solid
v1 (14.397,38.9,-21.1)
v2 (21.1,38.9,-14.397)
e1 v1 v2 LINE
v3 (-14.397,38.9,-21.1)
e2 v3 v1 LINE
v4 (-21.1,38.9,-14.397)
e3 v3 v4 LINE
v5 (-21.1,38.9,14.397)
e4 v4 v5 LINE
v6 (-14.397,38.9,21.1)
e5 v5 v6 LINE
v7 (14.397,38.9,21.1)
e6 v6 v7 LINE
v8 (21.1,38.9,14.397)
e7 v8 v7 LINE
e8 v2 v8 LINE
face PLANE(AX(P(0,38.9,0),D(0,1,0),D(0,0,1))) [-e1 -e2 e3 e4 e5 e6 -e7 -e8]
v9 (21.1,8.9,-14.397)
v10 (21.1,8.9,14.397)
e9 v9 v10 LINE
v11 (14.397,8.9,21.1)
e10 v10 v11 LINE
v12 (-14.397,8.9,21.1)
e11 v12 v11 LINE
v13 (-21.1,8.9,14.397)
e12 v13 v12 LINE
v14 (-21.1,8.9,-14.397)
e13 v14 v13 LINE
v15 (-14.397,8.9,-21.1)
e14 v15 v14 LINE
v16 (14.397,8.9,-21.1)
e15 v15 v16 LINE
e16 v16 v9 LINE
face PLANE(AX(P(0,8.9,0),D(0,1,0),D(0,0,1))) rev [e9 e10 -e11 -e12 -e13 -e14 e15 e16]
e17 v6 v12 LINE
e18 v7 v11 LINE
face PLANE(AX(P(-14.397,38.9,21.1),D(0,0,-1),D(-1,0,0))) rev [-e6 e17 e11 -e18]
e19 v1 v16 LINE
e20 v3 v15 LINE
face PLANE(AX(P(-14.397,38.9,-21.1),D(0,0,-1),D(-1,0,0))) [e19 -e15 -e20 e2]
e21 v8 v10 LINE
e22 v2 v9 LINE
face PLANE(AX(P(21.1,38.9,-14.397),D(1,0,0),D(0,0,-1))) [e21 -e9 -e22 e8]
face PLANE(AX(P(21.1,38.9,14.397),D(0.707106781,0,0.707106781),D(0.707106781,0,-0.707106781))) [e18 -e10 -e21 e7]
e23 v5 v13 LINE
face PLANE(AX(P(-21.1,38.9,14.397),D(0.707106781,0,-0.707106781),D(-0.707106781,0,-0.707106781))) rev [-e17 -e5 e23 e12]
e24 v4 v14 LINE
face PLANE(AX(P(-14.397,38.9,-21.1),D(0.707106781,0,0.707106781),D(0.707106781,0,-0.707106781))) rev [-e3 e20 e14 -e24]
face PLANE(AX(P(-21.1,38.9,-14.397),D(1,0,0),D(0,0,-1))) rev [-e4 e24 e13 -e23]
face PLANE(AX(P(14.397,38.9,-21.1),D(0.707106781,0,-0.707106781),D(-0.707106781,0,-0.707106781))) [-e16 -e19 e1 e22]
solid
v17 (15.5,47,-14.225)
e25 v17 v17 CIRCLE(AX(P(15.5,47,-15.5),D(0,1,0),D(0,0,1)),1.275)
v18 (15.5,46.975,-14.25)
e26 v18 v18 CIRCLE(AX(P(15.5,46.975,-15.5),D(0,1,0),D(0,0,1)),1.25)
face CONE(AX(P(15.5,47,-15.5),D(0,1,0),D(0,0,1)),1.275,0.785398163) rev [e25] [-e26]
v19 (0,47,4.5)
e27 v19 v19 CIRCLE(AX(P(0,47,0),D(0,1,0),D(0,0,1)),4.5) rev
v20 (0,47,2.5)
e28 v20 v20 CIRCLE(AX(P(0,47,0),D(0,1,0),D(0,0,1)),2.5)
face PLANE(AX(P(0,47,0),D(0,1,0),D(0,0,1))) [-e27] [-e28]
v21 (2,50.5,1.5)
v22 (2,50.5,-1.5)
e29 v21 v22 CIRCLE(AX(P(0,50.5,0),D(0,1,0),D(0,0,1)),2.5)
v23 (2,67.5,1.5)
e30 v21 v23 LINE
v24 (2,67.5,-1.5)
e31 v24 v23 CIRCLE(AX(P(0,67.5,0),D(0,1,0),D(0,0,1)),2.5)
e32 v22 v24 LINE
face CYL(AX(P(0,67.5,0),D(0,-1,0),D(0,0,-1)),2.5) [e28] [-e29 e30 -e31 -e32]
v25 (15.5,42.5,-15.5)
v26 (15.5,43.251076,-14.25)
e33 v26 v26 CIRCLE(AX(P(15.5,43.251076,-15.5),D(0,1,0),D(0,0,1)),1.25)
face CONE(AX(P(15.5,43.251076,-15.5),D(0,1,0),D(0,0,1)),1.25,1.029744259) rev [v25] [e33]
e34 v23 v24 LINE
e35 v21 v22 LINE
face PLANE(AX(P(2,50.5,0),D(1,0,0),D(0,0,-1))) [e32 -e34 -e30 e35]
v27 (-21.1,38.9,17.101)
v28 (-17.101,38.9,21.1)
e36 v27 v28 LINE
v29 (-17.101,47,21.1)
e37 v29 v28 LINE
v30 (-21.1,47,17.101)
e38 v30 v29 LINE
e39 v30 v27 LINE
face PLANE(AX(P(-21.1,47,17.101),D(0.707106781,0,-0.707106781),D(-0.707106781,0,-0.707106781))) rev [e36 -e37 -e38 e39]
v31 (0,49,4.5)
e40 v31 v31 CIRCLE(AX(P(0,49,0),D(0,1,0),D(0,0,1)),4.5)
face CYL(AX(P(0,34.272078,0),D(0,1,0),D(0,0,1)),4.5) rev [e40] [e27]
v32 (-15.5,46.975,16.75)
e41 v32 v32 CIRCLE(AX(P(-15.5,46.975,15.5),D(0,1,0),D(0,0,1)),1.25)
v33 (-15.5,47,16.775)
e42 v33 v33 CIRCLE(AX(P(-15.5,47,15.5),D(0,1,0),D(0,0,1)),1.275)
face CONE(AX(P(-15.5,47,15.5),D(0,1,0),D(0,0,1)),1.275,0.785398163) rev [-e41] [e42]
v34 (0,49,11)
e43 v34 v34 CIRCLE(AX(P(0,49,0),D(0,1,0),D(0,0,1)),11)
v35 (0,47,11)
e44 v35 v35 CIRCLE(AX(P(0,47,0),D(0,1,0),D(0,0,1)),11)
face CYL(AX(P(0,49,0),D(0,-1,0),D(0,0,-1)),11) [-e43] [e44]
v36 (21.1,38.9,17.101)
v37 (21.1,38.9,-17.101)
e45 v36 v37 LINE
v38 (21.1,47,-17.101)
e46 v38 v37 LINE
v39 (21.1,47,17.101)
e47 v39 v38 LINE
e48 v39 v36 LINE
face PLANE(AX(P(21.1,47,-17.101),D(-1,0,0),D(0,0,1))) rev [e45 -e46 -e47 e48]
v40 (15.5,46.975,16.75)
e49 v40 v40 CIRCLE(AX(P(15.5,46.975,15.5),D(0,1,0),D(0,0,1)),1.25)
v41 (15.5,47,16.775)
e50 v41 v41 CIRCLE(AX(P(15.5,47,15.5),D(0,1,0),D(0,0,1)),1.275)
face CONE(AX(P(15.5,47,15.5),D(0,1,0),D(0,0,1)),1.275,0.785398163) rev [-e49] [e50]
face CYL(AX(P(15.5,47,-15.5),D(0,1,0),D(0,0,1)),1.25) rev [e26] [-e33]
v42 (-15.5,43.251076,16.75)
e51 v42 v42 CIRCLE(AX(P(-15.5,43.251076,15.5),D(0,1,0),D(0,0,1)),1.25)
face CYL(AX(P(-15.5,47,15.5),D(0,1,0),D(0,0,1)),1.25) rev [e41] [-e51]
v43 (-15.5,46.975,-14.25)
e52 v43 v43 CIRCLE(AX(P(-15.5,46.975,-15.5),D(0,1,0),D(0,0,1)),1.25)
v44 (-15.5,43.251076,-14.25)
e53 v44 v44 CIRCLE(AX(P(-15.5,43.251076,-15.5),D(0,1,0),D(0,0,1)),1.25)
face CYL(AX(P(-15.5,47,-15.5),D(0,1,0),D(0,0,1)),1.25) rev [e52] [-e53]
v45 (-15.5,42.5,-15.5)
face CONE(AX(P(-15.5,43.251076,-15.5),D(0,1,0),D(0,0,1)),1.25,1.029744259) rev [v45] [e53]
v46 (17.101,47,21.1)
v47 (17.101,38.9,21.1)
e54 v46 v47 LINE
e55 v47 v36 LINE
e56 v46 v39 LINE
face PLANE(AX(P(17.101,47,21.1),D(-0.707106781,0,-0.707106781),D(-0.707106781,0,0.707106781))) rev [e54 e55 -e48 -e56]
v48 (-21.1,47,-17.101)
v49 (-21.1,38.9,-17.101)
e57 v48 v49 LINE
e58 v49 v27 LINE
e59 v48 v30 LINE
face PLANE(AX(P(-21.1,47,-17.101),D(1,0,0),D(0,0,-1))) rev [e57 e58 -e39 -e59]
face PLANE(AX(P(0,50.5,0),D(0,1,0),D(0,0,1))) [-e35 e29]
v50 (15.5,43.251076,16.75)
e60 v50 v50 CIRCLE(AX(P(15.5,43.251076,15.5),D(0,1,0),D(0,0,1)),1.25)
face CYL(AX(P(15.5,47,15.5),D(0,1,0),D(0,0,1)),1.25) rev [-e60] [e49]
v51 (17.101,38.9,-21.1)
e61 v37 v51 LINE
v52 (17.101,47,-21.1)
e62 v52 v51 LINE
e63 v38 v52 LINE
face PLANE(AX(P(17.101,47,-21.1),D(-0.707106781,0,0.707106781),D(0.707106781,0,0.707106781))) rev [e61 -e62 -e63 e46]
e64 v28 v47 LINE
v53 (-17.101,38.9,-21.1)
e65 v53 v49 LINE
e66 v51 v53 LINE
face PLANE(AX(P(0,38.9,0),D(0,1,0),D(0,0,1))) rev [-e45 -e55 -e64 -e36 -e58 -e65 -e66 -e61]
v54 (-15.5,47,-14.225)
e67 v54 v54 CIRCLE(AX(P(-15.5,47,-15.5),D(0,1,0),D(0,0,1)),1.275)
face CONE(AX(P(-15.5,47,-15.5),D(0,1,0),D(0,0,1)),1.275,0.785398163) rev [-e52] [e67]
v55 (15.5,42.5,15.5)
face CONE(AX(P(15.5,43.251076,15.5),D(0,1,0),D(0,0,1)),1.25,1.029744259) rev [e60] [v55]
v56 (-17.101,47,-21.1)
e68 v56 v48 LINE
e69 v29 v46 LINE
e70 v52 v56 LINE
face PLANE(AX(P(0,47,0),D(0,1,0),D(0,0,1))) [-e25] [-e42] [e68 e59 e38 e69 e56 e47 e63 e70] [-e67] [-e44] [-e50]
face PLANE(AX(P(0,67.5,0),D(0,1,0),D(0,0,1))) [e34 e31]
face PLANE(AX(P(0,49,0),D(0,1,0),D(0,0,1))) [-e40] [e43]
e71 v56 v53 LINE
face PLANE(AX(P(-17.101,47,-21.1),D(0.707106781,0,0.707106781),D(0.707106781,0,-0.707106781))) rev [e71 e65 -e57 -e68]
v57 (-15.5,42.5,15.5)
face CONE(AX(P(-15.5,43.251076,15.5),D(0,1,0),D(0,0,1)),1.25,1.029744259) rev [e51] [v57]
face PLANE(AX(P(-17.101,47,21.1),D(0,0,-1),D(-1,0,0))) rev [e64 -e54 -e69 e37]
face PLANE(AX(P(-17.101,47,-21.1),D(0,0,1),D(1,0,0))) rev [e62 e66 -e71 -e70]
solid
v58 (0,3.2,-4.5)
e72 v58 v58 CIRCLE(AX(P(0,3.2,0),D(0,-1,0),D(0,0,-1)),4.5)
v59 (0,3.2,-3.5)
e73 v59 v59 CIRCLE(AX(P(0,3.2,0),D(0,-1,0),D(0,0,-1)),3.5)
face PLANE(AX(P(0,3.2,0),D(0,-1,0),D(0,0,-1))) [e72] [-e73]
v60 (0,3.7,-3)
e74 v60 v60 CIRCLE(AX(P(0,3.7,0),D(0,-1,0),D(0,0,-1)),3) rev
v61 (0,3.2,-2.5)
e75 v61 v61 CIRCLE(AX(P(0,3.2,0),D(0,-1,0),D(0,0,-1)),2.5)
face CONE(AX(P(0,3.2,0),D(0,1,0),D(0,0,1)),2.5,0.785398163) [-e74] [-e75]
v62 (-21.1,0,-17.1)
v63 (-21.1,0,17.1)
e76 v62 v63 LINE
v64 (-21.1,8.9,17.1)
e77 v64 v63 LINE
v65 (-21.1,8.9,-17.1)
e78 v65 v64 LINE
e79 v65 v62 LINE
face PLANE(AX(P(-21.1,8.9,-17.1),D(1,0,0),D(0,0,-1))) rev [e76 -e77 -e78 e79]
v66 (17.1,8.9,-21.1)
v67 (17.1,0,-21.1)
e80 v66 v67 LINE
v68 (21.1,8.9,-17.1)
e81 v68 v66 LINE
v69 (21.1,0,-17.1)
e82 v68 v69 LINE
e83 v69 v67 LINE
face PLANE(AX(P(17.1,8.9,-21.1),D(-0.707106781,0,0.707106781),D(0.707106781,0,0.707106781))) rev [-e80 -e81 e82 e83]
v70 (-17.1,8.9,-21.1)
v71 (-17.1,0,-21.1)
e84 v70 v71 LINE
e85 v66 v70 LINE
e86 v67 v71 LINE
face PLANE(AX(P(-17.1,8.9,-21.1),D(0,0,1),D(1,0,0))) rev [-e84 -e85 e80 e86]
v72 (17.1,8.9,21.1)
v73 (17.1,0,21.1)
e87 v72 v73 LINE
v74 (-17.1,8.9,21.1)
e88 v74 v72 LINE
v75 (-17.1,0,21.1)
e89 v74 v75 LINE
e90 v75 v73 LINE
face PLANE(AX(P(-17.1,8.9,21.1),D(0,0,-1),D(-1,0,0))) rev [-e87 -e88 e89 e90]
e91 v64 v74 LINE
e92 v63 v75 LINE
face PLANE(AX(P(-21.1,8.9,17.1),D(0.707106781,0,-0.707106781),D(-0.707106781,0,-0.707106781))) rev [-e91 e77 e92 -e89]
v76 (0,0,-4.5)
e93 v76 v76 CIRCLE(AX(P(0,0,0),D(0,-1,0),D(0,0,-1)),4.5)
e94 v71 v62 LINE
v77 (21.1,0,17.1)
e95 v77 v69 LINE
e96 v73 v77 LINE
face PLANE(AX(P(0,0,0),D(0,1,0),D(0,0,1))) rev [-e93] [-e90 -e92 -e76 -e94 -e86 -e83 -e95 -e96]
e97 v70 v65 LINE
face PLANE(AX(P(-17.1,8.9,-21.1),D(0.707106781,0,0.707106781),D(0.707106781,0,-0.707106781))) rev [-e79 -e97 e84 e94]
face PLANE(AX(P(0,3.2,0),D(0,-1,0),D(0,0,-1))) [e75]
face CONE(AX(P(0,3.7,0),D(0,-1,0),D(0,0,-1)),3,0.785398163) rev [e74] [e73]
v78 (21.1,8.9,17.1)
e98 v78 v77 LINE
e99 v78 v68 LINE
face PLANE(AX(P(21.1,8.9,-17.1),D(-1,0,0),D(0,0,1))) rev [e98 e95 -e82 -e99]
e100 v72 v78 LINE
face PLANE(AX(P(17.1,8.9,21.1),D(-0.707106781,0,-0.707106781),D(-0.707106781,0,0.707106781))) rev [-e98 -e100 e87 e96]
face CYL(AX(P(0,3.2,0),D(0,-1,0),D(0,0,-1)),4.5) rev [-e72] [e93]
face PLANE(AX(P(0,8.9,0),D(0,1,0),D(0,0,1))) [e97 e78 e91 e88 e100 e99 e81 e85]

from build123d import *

# Parameters (mm, degrees)
BOSS_EXTRUDE2_DEPTH              = 8.9
BOSS_EXTRUDE3_DEPTH              = 0.5
LPATTERN8_COUNT                  = 60
LPATTERN8_PITCH                  = 0.5
BOSS_EXTRUDE4_DEPTH              = 8.1
SKETCH5_R                        = 11
BOSS_EXTRUDE5_DEPTH              = 2
SKETCH6_R                        = 4.5
CUT_EXTRUDE1_DEPTH               = 2
SKETCH7_R                        = 2.5
BOSS_EXTRUDE6_DEPTH              = 20.5
CUT_EXTRUDE2_DEPTH               = 17
TAP_DRILL_FOR_M3_TAP1_AT_2_COUNT = 2
TAP_DRILL_FOR_M3_TAP1_AT_2_PITCH = 31
TAP_DRILL_FOR_M3_TAP1_AT_3_COUNT = 2
TAP_DRILL_FOR_M3_TAP1_AT_3_PITCH = 43.840620434
TAP_DRILL_FOR_M3_TAP1_AT_4_COUNT = 2
TAP_DRILL_FOR_M3_TAP1_AT_4_PITCH = 31
SKETCH37_R                       = 4.5
CUT_EXTRUDE8_DEPTH               = 3.2
SKETCH38_R                       = 3.5
SKETCH38_R_2                     = 2.5
CUT_EXTRUDE9_DEPTH               = 0.5
CHAMFER1_SIZE                    = 0.5


with BuildPart() as part:
    # Sketch2 → Boss-Extrude2 (new body)
    with BuildSketch(Plane(origin=(0, 0, 0), x_dir=(1, 0, 0), z_dir=(0, 1, 0))):
        Polygon((-17.1, 21.1), (-21.1, 17.1), (-21.1, -17.1), (-17.1, -21.1), (17.1, -21.1), (21.1, -17.1), (21.1, 17.1), (17.1, 21.1), align=None)
    extrude(amount=BOSS_EXTRUDE2_DEPTH)

    # Sketch37 → Cut-Extrude8 (cut)
    with BuildSketch(Plane.XZ):
        with Locations(Location((0, 0, 0), (0, 0, 90))):
            Circle(SKETCH37_R)
    extrude(amount=-CUT_EXTRUDE8_DEPTH, mode=Mode.SUBTRACT)

    # Sketch38 → Cut-Extrude9 (cut)
    with BuildSketch(Plane.XZ.offset(-3.2)):
        with Locations(Location((0, 0, 0), (0, 0, 270))):
            Circle(SKETCH38_R)
        with Locations(Location((0, 0, 0), (0, 0, 323.130102354))):
            Circle(SKETCH38_R_2, mode=Mode.SUBTRACT)
    extrude(amount=-CUT_EXTRUDE9_DEPTH, mode=Mode.SUBTRACT)

    # Chamfer1
    chamfer1_edges = [part.edges().sort_by_distance(p)[0] for p in [
        (0, 3.7, 3.5),
        (-2, 3.7, 1.5),
    ]]
    chamfer(chamfer1_edges, length=CHAMFER1_SIZE - 0.0001)  # a hair under: the kernel refuses the full size


with BuildPart() as body_2:
    # Sketch3 → Boss-Extrude3 (new body)
    with BuildSketch(Plane(origin=(0, 8.9, 0), x_dir=(1, 0, 0), z_dir=(0, 1, 0))):
        Polygon((-14.397, 21.1), (-21.1, 14.397), (-21.1, -14.397), (-14.397, -21.1), (14.397, -21.1), (21.1, -14.397), (21.1, 14.397), (14.397, 21.1), align=None)
    extrude(amount=BOSS_EXTRUDE3_DEPTH)


with BuildPart() as lpattern8_1:
    # LPattern8: pattern copy
    add(body_2.part.moved(Location(Vector(0, 1, 0) * (1 * LPATTERN8_PITCH))))


with BuildPart() as lpattern8_2:
    # LPattern8: pattern copy
    add(body_2.part.moved(Location(Vector(0, 1, 0) * (2 * LPATTERN8_PITCH))))


with BuildPart() as lpattern8_3:
    # LPattern8: pattern copy
    add(body_2.part.moved(Location(Vector(0, 1, 0) * (3 * LPATTERN8_PITCH))))


with BuildPart() as lpattern8_4:
    # LPattern8: pattern copy
    add(body_2.part.moved(Location(Vector(0, 1, 0) * (4 * LPATTERN8_PITCH))))


with BuildPart() as lpattern8_5:
    # LPattern8: pattern copy
    add(body_2.part.moved(Location(Vector(0, 1, 0) * (5 * LPATTERN8_PITCH))))


with BuildPart() as lpattern8_6:
    # LPattern8: pattern copy
    add(body_2.part.moved(Location(Vector(0, 1, 0) * (6 * LPATTERN8_PITCH))))


with BuildPart() as lpattern8_7:
    # LPattern8: pattern copy
    add(body_2.part.moved(Location(Vector(0, 1, 0) * (7 * LPATTERN8_PITCH))))


with BuildPart() as lpattern8_8:
    # LPattern8: pattern copy
    add(body_2.part.moved(Location(Vector(0, 1, 0) * (8 * LPATTERN8_PITCH))))


with BuildPart() as lpattern8_9:
    # LPattern8: pattern copy
    add(body_2.part.moved(Location(Vector(0, 1, 0) * (9 * LPATTERN8_PITCH))))


with BuildPart() as lpattern8_10:
    # LPattern8: pattern copy
    add(body_2.part.moved(Location(Vector(0, 1, 0) * (10 * LPATTERN8_PITCH))))


with BuildPart() as lpattern8_11:
    # LPattern8: pattern copy
    add(body_2.part.moved(Location(Vector(0, 1, 0) * (11 * LPATTERN8_PITCH))))


with BuildPart() as lpattern8_12:
    # LPattern8: pattern copy
    add(body_2.part.moved(Location(Vector(0, 1, 0) * (12 * LPATTERN8_PITCH))))


with BuildPart() as lpattern8_13:
    # LPattern8: pattern copy
    add(body_2.part.moved(Location(Vector(0, 1, 0) * (13 * LPATTERN8_PITCH))))


with BuildPart() as lpattern8_14:
    # LPattern8: pattern copy
    add(body_2.part.moved(Location(Vector(0, 1, 0) * (14 * LPATTERN8_PITCH))))


with BuildPart() as lpattern8_15:
    # LPattern8: pattern copy
    add(body_2.part.moved(Location(Vector(0, 1, 0) * (15 * LPATTERN8_PITCH))))


with BuildPart() as lpattern8_16:
    # LPattern8: pattern copy
    add(body_2.part.moved(Location(Vector(0, 1, 0) * (16 * LPATTERN8_PITCH))))


with BuildPart() as lpattern8_17:
    # LPattern8: pattern copy
    add(body_2.part.moved(Location(Vector(0, 1, 0) * (17 * LPATTERN8_PITCH))))


with BuildPart() as lpattern8_18:
    # LPattern8: pattern copy
    add(body_2.part.moved(Location(Vector(0, 1, 0) * (18 * LPATTERN8_PITCH))))


with BuildPart() as lpattern8_19:
    # LPattern8: pattern copy
    add(body_2.part.moved(Location(Vector(0, 1, 0) * (19 * LPATTERN8_PITCH))))


with BuildPart() as lpattern8_20:
    # LPattern8: pattern copy
    add(body_2.part.moved(Location(Vector(0, 1, 0) * (20 * LPATTERN8_PITCH))))


with BuildPart() as lpattern8_21:
    # LPattern8: pattern copy
    add(body_2.part.moved(Location(Vector(0, 1, 0) * (21 * LPATTERN8_PITCH))))


with BuildPart() as lpattern8_22:
    # LPattern8: pattern copy
    add(body_2.part.moved(Location(Vector(0, 1, 0) * (22 * LPATTERN8_PITCH))))


with BuildPart() as lpattern8_23:
    # LPattern8: pattern copy
    add(body_2.part.moved(Location(Vector(0, 1, 0) * (23 * LPATTERN8_PITCH))))


with BuildPart() as lpattern8_24:
    # LPattern8: pattern copy
    add(body_2.part.moved(Location(Vector(0, 1, 0) * (24 * LPATTERN8_PITCH))))


with BuildPart() as lpattern8_25:
    # LPattern8: pattern copy
    add(body_2.part.moved(Location(Vector(0, 1, 0) * (25 * LPATTERN8_PITCH))))


with BuildPart() as lpattern8_26:
    # LPattern8: pattern copy
    add(body_2.part.moved(Location(Vector(0, 1, 0) * (26 * LPATTERN8_PITCH))))


with BuildPart() as lpattern8_27:
    # LPattern8: pattern copy
    add(body_2.part.moved(Location(Vector(0, 1, 0) * (27 * LPATTERN8_PITCH))))


with BuildPart() as lpattern8_28:
    # LPattern8: pattern copy
    add(body_2.part.moved(Location(Vector(0, 1, 0) * (28 * LPATTERN8_PITCH))))


with BuildPart() as lpattern8_29:
    # LPattern8: pattern copy
    add(body_2.part.moved(Location(Vector(0, 1, 0) * (29 * LPATTERN8_PITCH))))


with BuildPart() as lpattern8_30:
    # LPattern8: pattern copy
    add(body_2.part.moved(Location(Vector(0, 1, 0) * (30 * LPATTERN8_PITCH))))


with BuildPart() as lpattern8_31:
    # LPattern8: pattern copy
    add(body_2.part.moved(Location(Vector(0, 1, 0) * (31 * LPATTERN8_PITCH))))


with BuildPart() as lpattern8_32:
    # LPattern8: pattern copy
    add(body_2.part.moved(Location(Vector(0, 1, 0) * (32 * LPATTERN8_PITCH))))


with BuildPart() as lpattern8_33:
    # LPattern8: pattern copy
    add(body_2.part.moved(Location(Vector(0, 1, 0) * (33 * LPATTERN8_PITCH))))


with BuildPart() as lpattern8_34:
    # LPattern8: pattern copy
    add(body_2.part.moved(Location(Vector(0, 1, 0) * (34 * LPATTERN8_PITCH))))


with BuildPart() as lpattern8_35:
    # LPattern8: pattern copy
    add(body_2.part.moved(Location(Vector(0, 1, 0) * (35 * LPATTERN8_PITCH))))


with BuildPart() as lpattern8_36:
    # LPattern8: pattern copy
    add(body_2.part.moved(Location(Vector(0, 1, 0) * (36 * LPATTERN8_PITCH))))


with BuildPart() as lpattern8_37:
    # LPattern8: pattern copy
    add(body_2.part.moved(Location(Vector(0, 1, 0) * (37 * LPATTERN8_PITCH))))


with BuildPart() as lpattern8_38:
    # LPattern8: pattern copy
    add(body_2.part.moved(Location(Vector(0, 1, 0) * (38 * LPATTERN8_PITCH))))


with BuildPart() as lpattern8_39:
    # LPattern8: pattern copy
    add(body_2.part.moved(Location(Vector(0, 1, 0) * (39 * LPATTERN8_PITCH))))


with BuildPart() as lpattern8_40:
    # LPattern8: pattern copy
    add(body_2.part.moved(Location(Vector(0, 1, 0) * (40 * LPATTERN8_PITCH))))


with BuildPart() as lpattern8_41:
    # LPattern8: pattern copy
    add(body_2.part.moved(Location(Vector(0, 1, 0) * (41 * LPATTERN8_PITCH))))


with BuildPart() as lpattern8_42:
    # LPattern8: pattern copy
    add(body_2.part.moved(Location(Vector(0, 1, 0) * (42 * LPATTERN8_PITCH))))


with BuildPart() as lpattern8_43:
    # LPattern8: pattern copy
    add(body_2.part.moved(Location(Vector(0, 1, 0) * (43 * LPATTERN8_PITCH))))


with BuildPart() as lpattern8_44:
    # LPattern8: pattern copy
    add(body_2.part.moved(Location(Vector(0, 1, 0) * (44 * LPATTERN8_PITCH))))


with BuildPart() as lpattern8_45:
    # LPattern8: pattern copy
    add(body_2.part.moved(Location(Vector(0, 1, 0) * (45 * LPATTERN8_PITCH))))


with BuildPart() as lpattern8_46:
    # LPattern8: pattern copy
    add(body_2.part.moved(Location(Vector(0, 1, 0) * (46 * LPATTERN8_PITCH))))


with BuildPart() as lpattern8_47:
    # LPattern8: pattern copy
    add(body_2.part.moved(Location(Vector(0, 1, 0) * (47 * LPATTERN8_PITCH))))


with BuildPart() as lpattern8_48:
    # LPattern8: pattern copy
    add(body_2.part.moved(Location(Vector(0, 1, 0) * (48 * LPATTERN8_PITCH))))


with BuildPart() as lpattern8_49:
    # LPattern8: pattern copy
    add(body_2.part.moved(Location(Vector(0, 1, 0) * (49 * LPATTERN8_PITCH))))


with BuildPart() as lpattern8_50:
    # LPattern8: pattern copy
    add(body_2.part.moved(Location(Vector(0, 1, 0) * (50 * LPATTERN8_PITCH))))


with BuildPart() as lpattern8_51:
    # LPattern8: pattern copy
    add(body_2.part.moved(Location(Vector(0, 1, 0) * (51 * LPATTERN8_PITCH))))


with BuildPart() as lpattern8_52:
    # LPattern8: pattern copy
    add(body_2.part.moved(Location(Vector(0, 1, 0) * (52 * LPATTERN8_PITCH))))


with BuildPart() as lpattern8_53:
    # LPattern8: pattern copy
    add(body_2.part.moved(Location(Vector(0, 1, 0) * (53 * LPATTERN8_PITCH))))


with BuildPart() as lpattern8_54:
    # LPattern8: pattern copy
    add(body_2.part.moved(Location(Vector(0, 1, 0) * (54 * LPATTERN8_PITCH))))


with BuildPart() as lpattern8_55:
    # LPattern8: pattern copy
    add(body_2.part.moved(Location(Vector(0, 1, 0) * (55 * LPATTERN8_PITCH))))


with BuildPart() as lpattern8_56:
    # LPattern8: pattern copy
    add(body_2.part.moved(Location(Vector(0, 1, 0) * (56 * LPATTERN8_PITCH))))


with BuildPart() as lpattern8_57:
    # LPattern8: pattern copy
    add(body_2.part.moved(Location(Vector(0, 1, 0) * (57 * LPATTERN8_PITCH))))


with BuildPart() as lpattern8_58:
    # LPattern8: pattern copy
    add(body_2.part.moved(Location(Vector(0, 1, 0) * (58 * LPATTERN8_PITCH))))


with BuildPart() as lpattern8_59:
    # LPattern8: pattern copy
    add(body_2.part.moved(Location(Vector(0, 1, 0) * (59 * LPATTERN8_PITCH))))


with BuildPart() as body_2_1:
    add(body_2.part)

    # Combine1: read off the stored shape, not the designer's step
    # Combine1: union LPattern8_2, LPattern8_3, LPattern8_7, LPattern8_8, LPattern8_11, LPattern8_12, LPattern8_13, LPattern8_21, LPattern8_22, LPattern8_24, LPattern8_25, LPattern8_29, LPattern8_30, LPattern8_36, LPattern8_1, LPattern8_4, LPattern8_5, LPattern8_6, LPattern8_9, LPattern8_10, LPattern8_14, LPattern8_15, LPattern8_16, LPattern8_17, LPattern8_18, LPattern8_19, LPattern8_20, LPattern8_23, LPattern8_26, LPattern8_27, LPattern8_28, LPattern8_31, LPattern8_32, LPattern8_33, LPattern8_34, LPattern8_35, LPattern8_37, LPattern8_38, LPattern8_39, LPattern8_40, LPattern8_41, LPattern8_42, LPattern8_43, LPattern8_44, LPattern8_45, LPattern8_46, LPattern8_47, LPattern8_48, LPattern8_49, LPattern8_50, LPattern8_51, LPattern8_52, LPattern8_53, LPattern8_54, LPattern8_56, LPattern8_55, LPattern8_57, LPattern8_58, LPattern8_59
    add(lpattern8_2.part)
    add(lpattern8_3.part)
    add(lpattern8_7.part)
    add(lpattern8_8.part)
    add(lpattern8_11.part)
    add(lpattern8_12.part)
    add(lpattern8_13.part)
    add(lpattern8_21.part)
    add(lpattern8_22.part)
    add(lpattern8_24.part)
    add(lpattern8_25.part)
    add(lpattern8_29.part)
    add(lpattern8_30.part)
    add(lpattern8_36.part)
    add(lpattern8_1.part)
    add(lpattern8_4.part)
    add(lpattern8_5.part)
    add(lpattern8_6.part)
    add(lpattern8_9.part)
    add(lpattern8_10.part)
    add(lpattern8_14.part)
    add(lpattern8_15.part)
    add(lpattern8_16.part)
    add(lpattern8_17.part)
    add(lpattern8_18.part)
    add(lpattern8_19.part)
    add(lpattern8_20.part)
    add(lpattern8_23.part)
    add(lpattern8_26.part)
    add(lpattern8_27.part)
    add(lpattern8_28.part)
    add(lpattern8_31.part)
    add(lpattern8_32.part)
    add(lpattern8_33.part)
    add(lpattern8_34.part)
    add(lpattern8_35.part)
    add(lpattern8_37.part)
    add(lpattern8_38.part)
    add(lpattern8_39.part)
    add(lpattern8_40.part)
    add(lpattern8_41.part)
    add(lpattern8_42.part)
    add(lpattern8_43.part)
    add(lpattern8_44.part)
    add(lpattern8_45.part)
    add(lpattern8_46.part)
    add(lpattern8_47.part)
    add(lpattern8_48.part)
    add(lpattern8_49.part)
    add(lpattern8_50.part)
    add(lpattern8_51.part)
    add(lpattern8_52.part)
    add(lpattern8_53.part)
    add(lpattern8_54.part)
    add(lpattern8_56.part)
    add(lpattern8_55.part)
    add(lpattern8_57.part)
    add(lpattern8_58.part)
    add(lpattern8_59.part)


with BuildPart() as body_3:
    # Sketch4 → Boss-Extrude4 (new body)
    with BuildSketch(Plane(origin=(0, 38.9, 0), x_dir=(1, 0, 0), z_dir=(0, 1, 0))):
        Polygon((-17.101, 21.1), (-21.1, 17.101), (-21.1, -17.101), (-17.101, -21.1), (17.101, -21.1), (21.1, -17.101), (21.1, 17.101), (17.101, 21.1), align=None)
    extrude(amount=BOSS_EXTRUDE4_DEPTH)

    # Sketch5 → Boss-Extrude5 (add)
    with BuildSketch(Plane(origin=(0, 47, 0), x_dir=(1, 0, 0), z_dir=(0, 1, 0))):
        with Locations(Location((0, 0, 0), (0, 0, 270))):
            Circle(SKETCH5_R)
    extrude(amount=BOSS_EXTRUDE5_DEPTH)

    # Sketch6 → Cut-Extrude1 (cut)
    with BuildSketch(Plane(origin=(0, 49, 0), x_dir=(1, 0, 0), z_dir=(0, 1, 0))):
        with Locations(Location((0, 0, 0), (0, 0, 270))):
            Circle(SKETCH6_R)
    extrude(amount=-CUT_EXTRUDE1_DEPTH, mode=Mode.SUBTRACT)

    # Sketch7 → Boss-Extrude6 (add)
    with BuildSketch(Plane(origin=(0, 47, 0), x_dir=(1, 0, 0), z_dir=(0, 1, 0))):
        with Locations(Location((0, 0, 0), (0, 0, 270))):
            Circle(SKETCH7_R)
    extrude(amount=BOSS_EXTRUDE6_DEPTH)

    # Sketch8 → Cut-Extrude2 (cut)
    with BuildSketch(Plane(origin=(0, 67.5, 0), x_dir=(1, 0, 0), z_dir=(0, 1, 0))):
        with BuildLine():
            Line((2, 1.5), (2, 0))
            Line((2, 0), (2, -1.5))
            ThreePointArc((2, -1.5), (2.371708245, -0.790569415), (2.5, 0))
            ThreePointArc((2.5, 0), (2.371708245, 0.790569415), (2, 1.5))
        make_face()
    extrude(amount=-CUT_EXTRUDE2_DEPTH, mode=Mode.SUBTRACT)

    # Sketch11 → Tap Drill for M3 Tap1 (revolve, cut)
    with BuildSketch(Plane(origin=(-15.5, 47, -15.5), x_dir=(0, 0, 1), z_dir=(1, 0, 0))):
        Polygon((0, 0), (0, 4.5), (1.25, 3.748924226), (1.25, 0.025), (1.275, 0), align=None)
    tap_drill_for_m3_tap1 = revolve(axis=Axis((-15.5, 53.35, -15.5), (0, -1, 0)), mode=Mode.SUBTRACT)

    # Tap Drill for M3 Tap1 at 2: Tap Drill for M3 Tap1 ×2
    with Locations(*[(0, 0, i * TAP_DRILL_FOR_M3_TAP1_AT_2_PITCH) for i in range(1, TAP_DRILL_FOR_M3_TAP1_AT_2_COUNT)]):
        add(tap_drill_for_m3_tap1, mode=Mode.SUBTRACT)

    # Tap Drill for M3 Tap1 at 3: Tap Drill for M3 Tap1 ×2
    with Locations(*[Vector(0.7071067811865476, 0, 0.7071067811865476) * (i * TAP_DRILL_FOR_M3_TAP1_AT_3_PITCH) for i in range(1, TAP_DRILL_FOR_M3_TAP1_AT_3_COUNT)]):
        add(tap_drill_for_m3_tap1, mode=Mode.SUBTRACT)

    # Tap Drill for M3 Tap1 at 4: Tap Drill for M3 Tap1 ×2
    with Locations(*[(i * TAP_DRILL_FOR_M3_TAP1_AT_4_PITCH, 0, 0) for i in range(1, TAP_DRILL_FOR_M3_TAP1_AT_4_COUNT)]):
        add(tap_drill_for_m3_tap1, mode=Mode.SUBTRACT)


solid = Compound([part.part, body_2_1.part, body_3.part])
